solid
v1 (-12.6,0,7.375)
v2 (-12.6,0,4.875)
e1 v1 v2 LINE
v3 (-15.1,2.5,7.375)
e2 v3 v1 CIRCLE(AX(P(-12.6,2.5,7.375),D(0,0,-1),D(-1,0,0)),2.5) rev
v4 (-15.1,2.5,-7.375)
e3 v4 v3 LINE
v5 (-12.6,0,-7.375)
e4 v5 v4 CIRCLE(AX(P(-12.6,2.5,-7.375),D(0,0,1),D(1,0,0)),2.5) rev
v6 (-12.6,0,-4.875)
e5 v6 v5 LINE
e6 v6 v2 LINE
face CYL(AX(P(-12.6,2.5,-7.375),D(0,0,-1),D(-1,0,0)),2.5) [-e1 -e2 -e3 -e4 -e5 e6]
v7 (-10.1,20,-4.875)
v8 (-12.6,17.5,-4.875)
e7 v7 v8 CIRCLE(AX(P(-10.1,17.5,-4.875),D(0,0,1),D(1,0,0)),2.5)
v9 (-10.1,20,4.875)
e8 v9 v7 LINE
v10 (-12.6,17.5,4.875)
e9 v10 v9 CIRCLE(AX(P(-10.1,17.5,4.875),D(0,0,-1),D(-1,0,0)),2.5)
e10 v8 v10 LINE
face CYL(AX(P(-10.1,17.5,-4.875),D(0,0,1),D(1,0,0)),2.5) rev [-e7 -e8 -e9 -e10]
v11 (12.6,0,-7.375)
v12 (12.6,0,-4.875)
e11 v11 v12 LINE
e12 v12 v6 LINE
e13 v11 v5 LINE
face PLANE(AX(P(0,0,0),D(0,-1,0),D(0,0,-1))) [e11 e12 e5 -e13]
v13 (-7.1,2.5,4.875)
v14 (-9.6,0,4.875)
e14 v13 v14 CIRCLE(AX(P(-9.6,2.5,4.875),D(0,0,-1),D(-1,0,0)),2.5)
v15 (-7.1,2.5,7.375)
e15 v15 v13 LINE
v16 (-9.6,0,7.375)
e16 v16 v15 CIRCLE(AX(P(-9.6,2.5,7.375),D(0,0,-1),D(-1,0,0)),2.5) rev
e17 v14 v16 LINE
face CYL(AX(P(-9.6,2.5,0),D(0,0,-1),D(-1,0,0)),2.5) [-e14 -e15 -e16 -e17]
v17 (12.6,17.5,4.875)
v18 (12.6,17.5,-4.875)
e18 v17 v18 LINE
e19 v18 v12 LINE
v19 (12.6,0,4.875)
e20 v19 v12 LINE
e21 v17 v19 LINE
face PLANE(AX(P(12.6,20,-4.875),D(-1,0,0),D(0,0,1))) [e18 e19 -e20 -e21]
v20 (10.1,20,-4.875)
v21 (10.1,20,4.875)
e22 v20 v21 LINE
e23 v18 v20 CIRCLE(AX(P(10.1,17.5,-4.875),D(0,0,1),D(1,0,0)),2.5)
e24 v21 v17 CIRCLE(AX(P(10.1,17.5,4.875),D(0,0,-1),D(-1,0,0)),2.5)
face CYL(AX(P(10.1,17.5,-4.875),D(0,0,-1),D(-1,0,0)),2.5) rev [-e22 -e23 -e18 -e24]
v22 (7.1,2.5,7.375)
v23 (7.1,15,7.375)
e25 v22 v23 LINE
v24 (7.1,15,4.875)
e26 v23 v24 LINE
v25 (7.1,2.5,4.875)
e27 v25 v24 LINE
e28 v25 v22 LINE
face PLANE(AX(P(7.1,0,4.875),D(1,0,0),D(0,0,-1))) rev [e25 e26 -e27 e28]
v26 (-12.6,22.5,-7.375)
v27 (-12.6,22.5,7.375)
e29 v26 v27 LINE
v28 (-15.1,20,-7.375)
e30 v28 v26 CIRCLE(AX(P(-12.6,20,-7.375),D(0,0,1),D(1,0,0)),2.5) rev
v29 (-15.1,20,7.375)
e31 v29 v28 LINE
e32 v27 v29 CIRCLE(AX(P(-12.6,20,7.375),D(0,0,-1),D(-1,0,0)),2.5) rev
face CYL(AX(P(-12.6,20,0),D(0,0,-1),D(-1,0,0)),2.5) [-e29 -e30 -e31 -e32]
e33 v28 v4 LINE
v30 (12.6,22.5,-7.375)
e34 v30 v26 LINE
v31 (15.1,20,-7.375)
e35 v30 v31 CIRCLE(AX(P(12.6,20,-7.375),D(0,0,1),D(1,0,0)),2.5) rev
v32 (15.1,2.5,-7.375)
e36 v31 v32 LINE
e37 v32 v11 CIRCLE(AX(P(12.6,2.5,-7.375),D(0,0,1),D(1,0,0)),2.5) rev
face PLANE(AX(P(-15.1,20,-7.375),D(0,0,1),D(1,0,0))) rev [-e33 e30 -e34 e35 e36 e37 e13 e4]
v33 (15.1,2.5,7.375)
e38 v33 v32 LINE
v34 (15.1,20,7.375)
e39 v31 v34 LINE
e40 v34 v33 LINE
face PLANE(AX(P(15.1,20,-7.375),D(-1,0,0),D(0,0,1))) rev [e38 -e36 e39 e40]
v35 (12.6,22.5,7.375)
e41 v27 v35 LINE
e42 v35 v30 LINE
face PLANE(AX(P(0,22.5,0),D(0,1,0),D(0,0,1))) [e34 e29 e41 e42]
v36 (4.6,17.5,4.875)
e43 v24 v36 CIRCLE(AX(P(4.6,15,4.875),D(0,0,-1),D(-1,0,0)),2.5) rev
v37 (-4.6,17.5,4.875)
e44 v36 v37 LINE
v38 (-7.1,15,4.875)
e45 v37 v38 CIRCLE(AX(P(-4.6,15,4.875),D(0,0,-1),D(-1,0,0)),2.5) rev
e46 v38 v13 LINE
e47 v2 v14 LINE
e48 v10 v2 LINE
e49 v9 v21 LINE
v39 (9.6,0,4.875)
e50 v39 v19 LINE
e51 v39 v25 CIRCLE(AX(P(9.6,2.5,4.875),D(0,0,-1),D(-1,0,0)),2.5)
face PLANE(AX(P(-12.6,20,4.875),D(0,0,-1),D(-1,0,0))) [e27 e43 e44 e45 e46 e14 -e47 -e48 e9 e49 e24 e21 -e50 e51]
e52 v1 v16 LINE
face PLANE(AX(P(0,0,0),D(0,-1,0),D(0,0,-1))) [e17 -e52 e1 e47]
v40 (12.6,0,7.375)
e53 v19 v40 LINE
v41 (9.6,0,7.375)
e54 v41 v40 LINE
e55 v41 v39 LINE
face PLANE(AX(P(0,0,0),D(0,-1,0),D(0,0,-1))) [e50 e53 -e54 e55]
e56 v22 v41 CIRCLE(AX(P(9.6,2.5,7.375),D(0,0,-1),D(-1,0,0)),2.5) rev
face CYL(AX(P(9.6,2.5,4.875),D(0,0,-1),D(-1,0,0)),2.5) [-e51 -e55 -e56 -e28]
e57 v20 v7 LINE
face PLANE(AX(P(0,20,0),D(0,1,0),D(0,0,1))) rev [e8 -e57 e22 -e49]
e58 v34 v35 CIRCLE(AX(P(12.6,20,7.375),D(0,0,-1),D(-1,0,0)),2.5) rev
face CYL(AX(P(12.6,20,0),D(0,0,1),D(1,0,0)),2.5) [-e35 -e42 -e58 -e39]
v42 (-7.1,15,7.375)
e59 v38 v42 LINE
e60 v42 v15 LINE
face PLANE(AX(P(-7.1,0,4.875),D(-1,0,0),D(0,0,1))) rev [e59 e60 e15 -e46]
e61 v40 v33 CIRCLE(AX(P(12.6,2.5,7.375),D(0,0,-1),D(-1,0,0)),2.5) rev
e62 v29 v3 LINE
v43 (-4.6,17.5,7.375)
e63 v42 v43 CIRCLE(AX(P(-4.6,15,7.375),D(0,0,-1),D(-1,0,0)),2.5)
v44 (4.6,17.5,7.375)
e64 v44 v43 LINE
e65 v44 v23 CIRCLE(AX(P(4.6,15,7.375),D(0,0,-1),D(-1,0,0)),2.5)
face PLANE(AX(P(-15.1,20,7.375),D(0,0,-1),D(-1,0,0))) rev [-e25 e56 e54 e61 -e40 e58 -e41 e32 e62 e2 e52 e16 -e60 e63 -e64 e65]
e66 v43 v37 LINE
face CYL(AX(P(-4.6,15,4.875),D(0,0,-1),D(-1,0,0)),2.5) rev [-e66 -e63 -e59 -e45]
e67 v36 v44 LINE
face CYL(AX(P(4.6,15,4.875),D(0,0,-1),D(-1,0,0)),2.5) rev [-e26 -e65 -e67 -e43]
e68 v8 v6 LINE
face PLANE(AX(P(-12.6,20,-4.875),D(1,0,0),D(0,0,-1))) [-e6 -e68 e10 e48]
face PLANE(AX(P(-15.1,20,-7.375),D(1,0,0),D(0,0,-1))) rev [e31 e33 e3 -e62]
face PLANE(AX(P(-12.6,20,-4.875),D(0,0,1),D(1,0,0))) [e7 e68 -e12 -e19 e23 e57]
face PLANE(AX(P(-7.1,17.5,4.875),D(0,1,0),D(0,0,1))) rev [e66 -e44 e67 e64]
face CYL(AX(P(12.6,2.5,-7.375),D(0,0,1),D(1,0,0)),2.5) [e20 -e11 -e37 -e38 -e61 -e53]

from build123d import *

# Parameters (mm, degrees)
SKETCH1_W           = 30.2
SKETCH1_H           = 14.75
SKETCH1_W_2         = 25.2
SKETCH1_H_2         = 9.75
BOSS_EXTRUDE1_DEPTH = 20
SKETCH2_W           = 30.2
SKETCH2_H           = 14.75
BOSS_EXTRUDE2_DEPTH = 2.5
SKETCH3_W           = 14.2
SKETCH3_H           = 17.5
CUT_EXTRUDE1_DEPTH  = 2.5
FILLET1_R           = 2.5
FILLET2_R           = 2.5
FILLET3_START       = -8
FILLET3_DEPTH       = 16
FILLET3_START_2     = 4.875
FILLET3_2_DEPTH     = 3.125
FILLET3_3_DEPTH     = 2.5


with BuildPart() as part:
    # Sketch1 → Boss-Extrude1 (new body)
    with BuildSketch(Plane(origin=(0, 0, 0), x_dir=(1, 0, 0), z_dir=(0, 1, 0))):
        Rectangle(SKETCH1_W, SKETCH1_H)
        Rectangle(SKETCH1_W_2, SKETCH1_H_2, mode=Mode.SUBTRACT)
    extrude(amount=BOSS_EXTRUDE1_DEPTH)

    # Sketch2 → Boss-Extrude2 (add)
    with BuildSketch(Plane(origin=(0, 20, 0), x_dir=(1, 0, 0), z_dir=(0, 1, 0))):
        Rectangle(SKETCH2_W, SKETCH2_H)
    extrude(amount=BOSS_EXTRUDE2_DEPTH)

    # Sketch3 → Cut-Extrude1 (cut)
    with BuildSketch(Plane.XY.offset(7.375)):
        with Locations((0, 8.75)):
            Rectangle(SKETCH3_W, SKETCH3_H)
    extrude(amount=-CUT_EXTRUDE1_DEPTH, mode=Mode.SUBTRACT)

    # Fillet1
    fillet1_edges = [part.edges().sort_by_distance(p)[0] for p in [
        (-15.1, 22.5, 0),
        (15.1, 22.5, 0),
    ]]
    fillet(fillet1_edges, radius=FILLET1_R)

    # Fillet2
    fillet2_edges = [part.edges().sort_by_distance(p)[0] for p in [
        (12.6, 20, 0),
        (-12.6, 20, 0),
    ]]
    fillet(fillet2_edges, radius=FILLET2_R)

    # Fillet3: read off the stored shape, not the designer's step
    # Fillet3 outline → Fillet3 (cut)
    with BuildSketch(Plane.XY.offset(FILLET3_START)):
        with BuildLine():
            Line((-15.1, 0), (-12.6, 0))
            ThreePointArc((-12.6, 0), (-14.367766953, 0.732233047), (-15.1, 2.5))
            Line((-15.1, 2.5), (-15.1, 0))
        make_face()
        with BuildLine():
            ThreePointArc((15.1, 2.5), (14.367766953, 0.732233047), (12.6, 0))
            Line((12.6, 0), (15.1, 0))
            Line((15.1, 0), (15.1, 2.5))
        make_face()
    extrude(amount=FILLET3_DEPTH, mode=Mode.SUBTRACT)

    # Fillet3 2 outline → Fillet3 2 (cut)
    with BuildSketch(Plane.XY.offset(FILLET3_START_2)):
        with BuildLine():
            ThreePointArc((-7.1, 2.5), (-7.832233047, 0.732233047), (-9.6, 0))
            Line((-9.6, 0), (-7.1, 0))
            Line((-7.1, 0), (-7.1, 2.5))
        make_face()
        with BuildLine():
            Line((7.1, 2.5), (7.1, 0))
            Line((7.1, 0), (9.6, 0))
            ThreePointArc((9.6, 0), (7.832233047, 0.732233047), (7.1, 2.5))
        make_face()
    extrude(amount=FILLET3_2_DEPTH, mode=Mode.SUBTRACT)

    # Fillet3 3 outline → Fillet3 3 (add)
    with BuildSketch(Plane.XY.offset(FILLET3_START_2)):
        with BuildLine():
            Line((-7.1, 17.5), (-7.1, 15))
            ThreePointArc((-7.1, 15), (-6.367766953, 16.767766953), (-4.6, 17.5))
            Line((-4.6, 17.5), (-7.1, 17.5))
        make_face()
        with BuildLine():
            Line((7.1, 17.5), (4.6, 17.5))
            ThreePointArc((4.6, 17.5), (6.367766953, 16.767766953), (7.1, 15))
            Line((7.1, 15), (7.1, 17.5))
        make_face()
    extrude(amount=FILLET3_3_DEPTH)


solid = part.part
